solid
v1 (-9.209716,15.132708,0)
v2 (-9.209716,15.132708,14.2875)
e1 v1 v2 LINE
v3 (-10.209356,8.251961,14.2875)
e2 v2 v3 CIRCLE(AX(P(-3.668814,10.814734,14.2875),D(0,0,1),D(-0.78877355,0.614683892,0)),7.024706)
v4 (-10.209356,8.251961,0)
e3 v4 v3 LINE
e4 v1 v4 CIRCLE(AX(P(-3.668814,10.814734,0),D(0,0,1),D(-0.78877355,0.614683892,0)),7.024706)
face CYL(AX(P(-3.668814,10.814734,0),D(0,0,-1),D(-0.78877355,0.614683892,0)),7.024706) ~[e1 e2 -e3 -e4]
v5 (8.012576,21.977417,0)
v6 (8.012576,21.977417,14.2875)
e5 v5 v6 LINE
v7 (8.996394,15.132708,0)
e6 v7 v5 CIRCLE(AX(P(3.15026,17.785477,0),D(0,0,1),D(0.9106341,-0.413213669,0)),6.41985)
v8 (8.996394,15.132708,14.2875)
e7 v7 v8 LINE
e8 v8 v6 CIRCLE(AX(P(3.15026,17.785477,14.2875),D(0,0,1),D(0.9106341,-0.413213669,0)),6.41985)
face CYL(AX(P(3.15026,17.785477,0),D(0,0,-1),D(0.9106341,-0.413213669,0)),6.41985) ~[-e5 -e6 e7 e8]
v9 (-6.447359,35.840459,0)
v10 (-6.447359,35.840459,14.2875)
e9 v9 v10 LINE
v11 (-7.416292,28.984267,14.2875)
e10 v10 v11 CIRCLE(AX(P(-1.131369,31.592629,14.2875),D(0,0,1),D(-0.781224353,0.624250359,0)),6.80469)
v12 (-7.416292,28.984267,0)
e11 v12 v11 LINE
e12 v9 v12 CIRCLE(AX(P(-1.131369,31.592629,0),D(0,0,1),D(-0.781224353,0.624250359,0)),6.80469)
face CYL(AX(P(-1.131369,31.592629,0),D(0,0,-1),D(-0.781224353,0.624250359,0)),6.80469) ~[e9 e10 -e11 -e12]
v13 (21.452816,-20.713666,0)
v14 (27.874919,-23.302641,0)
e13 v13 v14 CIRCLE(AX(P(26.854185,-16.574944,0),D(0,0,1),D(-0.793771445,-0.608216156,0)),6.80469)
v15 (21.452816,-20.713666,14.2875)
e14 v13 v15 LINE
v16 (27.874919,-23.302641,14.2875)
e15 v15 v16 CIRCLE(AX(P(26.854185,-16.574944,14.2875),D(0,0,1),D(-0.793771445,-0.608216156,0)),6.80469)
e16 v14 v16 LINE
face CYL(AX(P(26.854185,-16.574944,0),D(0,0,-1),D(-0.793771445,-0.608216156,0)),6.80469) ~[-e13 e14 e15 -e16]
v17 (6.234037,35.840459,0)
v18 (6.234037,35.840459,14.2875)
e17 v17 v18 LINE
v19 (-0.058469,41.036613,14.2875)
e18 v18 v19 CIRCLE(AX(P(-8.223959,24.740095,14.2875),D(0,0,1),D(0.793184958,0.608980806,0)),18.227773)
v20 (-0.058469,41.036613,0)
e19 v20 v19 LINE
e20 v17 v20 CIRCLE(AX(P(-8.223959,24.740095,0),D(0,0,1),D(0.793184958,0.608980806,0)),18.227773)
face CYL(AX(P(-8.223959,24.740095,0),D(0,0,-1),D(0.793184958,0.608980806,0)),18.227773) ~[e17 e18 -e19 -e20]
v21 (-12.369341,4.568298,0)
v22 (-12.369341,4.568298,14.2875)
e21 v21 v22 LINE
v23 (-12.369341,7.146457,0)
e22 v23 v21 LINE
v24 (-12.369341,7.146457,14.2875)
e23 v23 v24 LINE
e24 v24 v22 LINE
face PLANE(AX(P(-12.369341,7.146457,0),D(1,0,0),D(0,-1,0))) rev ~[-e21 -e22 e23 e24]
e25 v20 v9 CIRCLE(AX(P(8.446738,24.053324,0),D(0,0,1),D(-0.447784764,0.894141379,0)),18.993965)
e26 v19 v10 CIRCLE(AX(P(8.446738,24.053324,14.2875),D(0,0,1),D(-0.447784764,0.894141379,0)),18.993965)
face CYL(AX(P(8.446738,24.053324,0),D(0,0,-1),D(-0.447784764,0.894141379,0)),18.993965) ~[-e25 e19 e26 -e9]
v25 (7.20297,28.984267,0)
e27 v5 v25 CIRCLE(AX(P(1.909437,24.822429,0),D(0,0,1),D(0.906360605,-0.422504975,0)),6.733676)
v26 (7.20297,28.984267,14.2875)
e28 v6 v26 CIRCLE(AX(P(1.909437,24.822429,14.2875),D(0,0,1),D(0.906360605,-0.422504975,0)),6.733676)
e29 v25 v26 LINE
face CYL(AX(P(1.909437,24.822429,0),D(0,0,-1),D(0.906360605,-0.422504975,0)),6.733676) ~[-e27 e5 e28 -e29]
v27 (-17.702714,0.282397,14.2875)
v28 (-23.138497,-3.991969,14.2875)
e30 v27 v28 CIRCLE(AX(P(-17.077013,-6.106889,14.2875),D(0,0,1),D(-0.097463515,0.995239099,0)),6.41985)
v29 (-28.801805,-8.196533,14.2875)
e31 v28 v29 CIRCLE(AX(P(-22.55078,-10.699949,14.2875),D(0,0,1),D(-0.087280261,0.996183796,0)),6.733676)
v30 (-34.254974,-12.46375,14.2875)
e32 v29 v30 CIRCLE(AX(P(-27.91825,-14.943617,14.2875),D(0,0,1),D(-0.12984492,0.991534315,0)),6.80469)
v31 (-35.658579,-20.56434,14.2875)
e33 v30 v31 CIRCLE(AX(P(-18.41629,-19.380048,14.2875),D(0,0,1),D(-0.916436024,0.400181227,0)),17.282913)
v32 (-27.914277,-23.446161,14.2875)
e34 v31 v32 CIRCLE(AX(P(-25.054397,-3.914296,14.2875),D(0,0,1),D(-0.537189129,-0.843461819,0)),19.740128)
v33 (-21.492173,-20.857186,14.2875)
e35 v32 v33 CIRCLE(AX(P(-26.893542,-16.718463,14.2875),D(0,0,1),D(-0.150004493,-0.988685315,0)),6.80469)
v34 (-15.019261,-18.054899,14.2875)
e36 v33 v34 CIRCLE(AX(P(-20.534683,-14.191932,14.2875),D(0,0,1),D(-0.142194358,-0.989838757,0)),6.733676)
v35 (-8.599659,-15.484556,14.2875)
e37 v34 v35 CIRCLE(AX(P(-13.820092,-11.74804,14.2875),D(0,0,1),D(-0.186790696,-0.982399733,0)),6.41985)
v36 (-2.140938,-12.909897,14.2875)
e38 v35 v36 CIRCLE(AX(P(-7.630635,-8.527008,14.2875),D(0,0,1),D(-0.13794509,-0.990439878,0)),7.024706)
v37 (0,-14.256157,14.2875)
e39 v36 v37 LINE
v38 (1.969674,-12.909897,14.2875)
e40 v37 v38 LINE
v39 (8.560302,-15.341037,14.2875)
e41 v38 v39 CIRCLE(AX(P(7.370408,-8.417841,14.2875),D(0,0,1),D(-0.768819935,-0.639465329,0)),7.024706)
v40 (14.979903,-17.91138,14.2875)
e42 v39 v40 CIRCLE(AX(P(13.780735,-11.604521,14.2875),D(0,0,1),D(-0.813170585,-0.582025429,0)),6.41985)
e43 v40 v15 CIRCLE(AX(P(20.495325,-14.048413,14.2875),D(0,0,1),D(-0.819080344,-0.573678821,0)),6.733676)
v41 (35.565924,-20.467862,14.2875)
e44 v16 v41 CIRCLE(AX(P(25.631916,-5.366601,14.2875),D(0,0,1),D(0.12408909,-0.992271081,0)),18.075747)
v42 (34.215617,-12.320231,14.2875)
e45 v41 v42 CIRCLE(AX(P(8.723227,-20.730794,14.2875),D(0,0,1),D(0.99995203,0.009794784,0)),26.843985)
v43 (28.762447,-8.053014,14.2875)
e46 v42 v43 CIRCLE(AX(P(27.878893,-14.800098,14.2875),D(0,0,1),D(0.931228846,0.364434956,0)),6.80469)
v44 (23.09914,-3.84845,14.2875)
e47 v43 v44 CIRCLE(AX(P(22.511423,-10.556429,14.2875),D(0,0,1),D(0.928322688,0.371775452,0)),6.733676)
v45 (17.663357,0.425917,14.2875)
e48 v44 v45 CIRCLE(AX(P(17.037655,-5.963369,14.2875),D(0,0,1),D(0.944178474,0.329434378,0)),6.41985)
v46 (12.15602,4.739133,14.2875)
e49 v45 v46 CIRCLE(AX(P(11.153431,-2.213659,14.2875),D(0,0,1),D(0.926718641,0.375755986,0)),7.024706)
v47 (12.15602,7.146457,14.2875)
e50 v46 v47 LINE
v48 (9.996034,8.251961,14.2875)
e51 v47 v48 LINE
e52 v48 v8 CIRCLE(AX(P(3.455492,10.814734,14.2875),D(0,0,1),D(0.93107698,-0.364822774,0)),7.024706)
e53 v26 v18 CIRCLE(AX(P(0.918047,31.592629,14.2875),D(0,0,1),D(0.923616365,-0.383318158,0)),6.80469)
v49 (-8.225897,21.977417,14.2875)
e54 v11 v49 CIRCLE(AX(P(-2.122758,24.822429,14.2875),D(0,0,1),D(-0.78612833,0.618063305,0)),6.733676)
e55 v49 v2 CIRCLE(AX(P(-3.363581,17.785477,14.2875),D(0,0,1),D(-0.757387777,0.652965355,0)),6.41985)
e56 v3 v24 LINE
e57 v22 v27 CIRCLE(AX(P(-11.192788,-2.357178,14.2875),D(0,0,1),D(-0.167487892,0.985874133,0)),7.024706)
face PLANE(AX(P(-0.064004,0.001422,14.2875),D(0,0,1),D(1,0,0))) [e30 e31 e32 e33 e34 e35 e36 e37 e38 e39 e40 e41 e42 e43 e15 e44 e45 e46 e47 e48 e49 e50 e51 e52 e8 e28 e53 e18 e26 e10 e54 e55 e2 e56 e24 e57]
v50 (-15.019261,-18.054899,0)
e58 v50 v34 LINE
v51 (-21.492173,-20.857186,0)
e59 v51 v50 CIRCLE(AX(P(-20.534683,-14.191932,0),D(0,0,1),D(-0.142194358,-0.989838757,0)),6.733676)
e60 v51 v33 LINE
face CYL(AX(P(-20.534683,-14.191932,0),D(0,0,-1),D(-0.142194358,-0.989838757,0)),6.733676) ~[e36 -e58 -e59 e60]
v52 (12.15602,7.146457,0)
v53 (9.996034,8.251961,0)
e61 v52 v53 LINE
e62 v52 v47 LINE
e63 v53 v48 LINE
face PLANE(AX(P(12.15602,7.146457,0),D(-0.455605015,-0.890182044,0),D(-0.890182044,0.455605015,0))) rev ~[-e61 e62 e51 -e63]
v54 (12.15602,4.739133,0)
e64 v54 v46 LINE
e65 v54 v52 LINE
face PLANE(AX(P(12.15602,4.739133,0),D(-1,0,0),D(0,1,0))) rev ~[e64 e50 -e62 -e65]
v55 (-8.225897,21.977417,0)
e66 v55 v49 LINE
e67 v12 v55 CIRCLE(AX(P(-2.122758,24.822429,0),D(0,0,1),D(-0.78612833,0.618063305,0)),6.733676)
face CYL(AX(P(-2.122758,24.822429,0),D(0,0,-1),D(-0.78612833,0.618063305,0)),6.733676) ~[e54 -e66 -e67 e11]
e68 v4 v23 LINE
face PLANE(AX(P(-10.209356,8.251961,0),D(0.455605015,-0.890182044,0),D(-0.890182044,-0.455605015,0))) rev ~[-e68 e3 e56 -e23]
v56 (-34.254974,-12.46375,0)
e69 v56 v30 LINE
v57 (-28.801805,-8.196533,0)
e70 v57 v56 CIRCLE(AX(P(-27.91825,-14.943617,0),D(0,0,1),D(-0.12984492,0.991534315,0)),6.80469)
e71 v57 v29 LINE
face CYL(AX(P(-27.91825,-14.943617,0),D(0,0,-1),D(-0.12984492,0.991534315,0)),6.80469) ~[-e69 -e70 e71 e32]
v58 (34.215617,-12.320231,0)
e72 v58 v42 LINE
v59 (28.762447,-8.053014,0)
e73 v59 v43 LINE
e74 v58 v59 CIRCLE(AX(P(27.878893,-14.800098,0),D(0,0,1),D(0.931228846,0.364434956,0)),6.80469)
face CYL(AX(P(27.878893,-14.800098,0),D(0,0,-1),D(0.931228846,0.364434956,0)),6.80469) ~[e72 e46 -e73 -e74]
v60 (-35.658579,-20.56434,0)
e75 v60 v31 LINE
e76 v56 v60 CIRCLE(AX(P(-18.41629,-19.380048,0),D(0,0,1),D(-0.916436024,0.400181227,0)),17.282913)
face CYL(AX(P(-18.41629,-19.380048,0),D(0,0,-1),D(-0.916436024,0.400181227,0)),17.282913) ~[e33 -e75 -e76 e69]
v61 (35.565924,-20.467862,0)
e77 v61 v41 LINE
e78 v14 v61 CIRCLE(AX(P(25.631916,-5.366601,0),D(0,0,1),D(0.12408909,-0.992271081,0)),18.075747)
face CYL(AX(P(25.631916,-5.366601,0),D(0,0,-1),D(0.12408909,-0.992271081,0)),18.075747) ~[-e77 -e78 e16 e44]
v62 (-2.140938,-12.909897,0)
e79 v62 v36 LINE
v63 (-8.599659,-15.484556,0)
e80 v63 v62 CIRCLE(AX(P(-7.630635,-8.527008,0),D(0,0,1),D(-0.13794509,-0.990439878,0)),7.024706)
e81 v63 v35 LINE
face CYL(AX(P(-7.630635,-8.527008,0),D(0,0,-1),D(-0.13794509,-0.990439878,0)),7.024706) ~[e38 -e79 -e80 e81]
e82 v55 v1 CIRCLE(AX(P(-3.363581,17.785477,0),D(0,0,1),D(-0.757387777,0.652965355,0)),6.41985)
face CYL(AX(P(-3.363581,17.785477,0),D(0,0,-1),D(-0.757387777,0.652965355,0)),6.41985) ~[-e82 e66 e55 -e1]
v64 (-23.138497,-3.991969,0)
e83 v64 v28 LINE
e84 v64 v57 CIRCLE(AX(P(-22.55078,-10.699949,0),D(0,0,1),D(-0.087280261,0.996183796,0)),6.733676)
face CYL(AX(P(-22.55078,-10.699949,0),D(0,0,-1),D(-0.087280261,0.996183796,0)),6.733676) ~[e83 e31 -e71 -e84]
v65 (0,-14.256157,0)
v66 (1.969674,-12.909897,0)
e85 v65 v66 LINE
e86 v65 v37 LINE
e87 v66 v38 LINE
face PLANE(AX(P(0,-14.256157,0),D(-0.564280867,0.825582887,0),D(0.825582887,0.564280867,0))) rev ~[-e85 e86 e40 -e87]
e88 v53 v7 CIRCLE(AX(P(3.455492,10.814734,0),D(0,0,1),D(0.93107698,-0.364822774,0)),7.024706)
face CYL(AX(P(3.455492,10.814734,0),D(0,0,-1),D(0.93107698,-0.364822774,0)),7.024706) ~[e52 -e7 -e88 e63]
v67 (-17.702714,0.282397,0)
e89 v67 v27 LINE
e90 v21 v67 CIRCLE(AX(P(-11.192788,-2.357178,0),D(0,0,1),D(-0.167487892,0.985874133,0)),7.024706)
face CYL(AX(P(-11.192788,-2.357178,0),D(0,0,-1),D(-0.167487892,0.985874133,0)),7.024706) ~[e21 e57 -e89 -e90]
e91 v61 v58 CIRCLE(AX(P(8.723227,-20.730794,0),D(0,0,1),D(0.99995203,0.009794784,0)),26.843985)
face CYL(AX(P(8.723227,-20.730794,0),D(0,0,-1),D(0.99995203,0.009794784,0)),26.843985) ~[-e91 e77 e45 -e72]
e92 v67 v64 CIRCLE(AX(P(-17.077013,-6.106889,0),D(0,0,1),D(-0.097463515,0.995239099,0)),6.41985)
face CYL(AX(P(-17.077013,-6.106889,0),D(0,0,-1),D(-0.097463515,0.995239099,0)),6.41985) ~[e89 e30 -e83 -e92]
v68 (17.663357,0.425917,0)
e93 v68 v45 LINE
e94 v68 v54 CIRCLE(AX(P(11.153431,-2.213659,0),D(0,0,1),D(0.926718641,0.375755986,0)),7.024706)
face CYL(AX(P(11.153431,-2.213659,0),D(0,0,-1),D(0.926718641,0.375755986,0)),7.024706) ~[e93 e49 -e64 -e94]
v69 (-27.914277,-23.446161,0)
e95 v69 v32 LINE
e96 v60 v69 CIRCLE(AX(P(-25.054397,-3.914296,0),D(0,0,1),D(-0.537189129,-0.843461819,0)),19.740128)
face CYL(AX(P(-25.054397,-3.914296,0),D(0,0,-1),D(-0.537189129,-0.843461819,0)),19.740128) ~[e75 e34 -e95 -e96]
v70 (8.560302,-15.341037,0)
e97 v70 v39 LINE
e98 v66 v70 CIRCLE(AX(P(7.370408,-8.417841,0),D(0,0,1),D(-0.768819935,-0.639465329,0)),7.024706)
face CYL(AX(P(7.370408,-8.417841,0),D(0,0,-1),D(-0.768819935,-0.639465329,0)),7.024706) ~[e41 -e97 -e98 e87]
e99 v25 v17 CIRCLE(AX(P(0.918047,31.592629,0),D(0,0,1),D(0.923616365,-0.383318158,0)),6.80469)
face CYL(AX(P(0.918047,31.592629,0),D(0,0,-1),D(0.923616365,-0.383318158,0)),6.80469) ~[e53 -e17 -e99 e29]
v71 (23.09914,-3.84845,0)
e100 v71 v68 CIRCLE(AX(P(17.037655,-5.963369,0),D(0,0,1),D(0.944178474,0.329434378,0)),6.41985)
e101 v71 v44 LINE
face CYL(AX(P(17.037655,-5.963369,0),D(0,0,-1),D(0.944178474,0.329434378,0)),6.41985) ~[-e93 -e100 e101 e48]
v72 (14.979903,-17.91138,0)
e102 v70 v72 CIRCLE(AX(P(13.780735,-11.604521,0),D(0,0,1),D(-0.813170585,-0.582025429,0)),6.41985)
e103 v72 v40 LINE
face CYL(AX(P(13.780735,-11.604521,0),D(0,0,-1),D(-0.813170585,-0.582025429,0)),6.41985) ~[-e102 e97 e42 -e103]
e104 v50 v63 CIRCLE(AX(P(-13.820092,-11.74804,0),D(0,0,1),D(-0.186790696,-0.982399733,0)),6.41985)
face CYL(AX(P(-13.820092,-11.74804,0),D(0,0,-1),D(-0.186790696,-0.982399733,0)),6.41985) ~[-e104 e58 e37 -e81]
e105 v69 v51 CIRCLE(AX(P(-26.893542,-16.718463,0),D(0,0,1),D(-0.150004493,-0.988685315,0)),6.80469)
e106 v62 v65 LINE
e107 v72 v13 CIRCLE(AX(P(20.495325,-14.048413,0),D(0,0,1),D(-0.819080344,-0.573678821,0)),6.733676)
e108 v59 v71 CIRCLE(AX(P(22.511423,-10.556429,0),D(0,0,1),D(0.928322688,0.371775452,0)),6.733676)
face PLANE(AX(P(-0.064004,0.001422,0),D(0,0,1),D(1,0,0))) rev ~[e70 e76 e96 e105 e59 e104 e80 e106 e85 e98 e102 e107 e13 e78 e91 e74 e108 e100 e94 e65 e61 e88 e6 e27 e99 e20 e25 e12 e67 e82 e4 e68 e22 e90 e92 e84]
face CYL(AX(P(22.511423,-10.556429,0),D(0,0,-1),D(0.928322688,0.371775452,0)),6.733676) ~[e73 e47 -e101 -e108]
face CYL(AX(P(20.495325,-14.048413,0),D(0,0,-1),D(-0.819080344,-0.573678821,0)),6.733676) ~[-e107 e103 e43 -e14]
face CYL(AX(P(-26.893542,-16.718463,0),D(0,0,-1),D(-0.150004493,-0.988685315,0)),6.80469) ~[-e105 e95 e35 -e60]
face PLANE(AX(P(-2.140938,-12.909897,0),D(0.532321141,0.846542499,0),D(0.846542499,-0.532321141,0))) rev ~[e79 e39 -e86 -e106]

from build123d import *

# Parameters (mm, degrees)
F1_DEPTH = 14.2875


# Not quite as in the source:
# - a length typed as a fraction of an inch, garbled in the dataset ("3 / 203.2 mm" for 3/8 in), is restored


with BuildPart() as f1:
    # F0 (on Top) → F1 (new body)
    with BuildSketch(Plane.XY):
        with BuildLine():
            ThreePointArc((-0.0584694644, 41.0366132855), (-3.5379130554, 38.7889545067), (-6.4473585226, 35.840459168))
            ThreePointArc((-6.4473585226, 35.840459168), (-7.8691085687, 32.5448223466), (-7.4162920937, 28.9842672646))
            ThreePointArc((-7.4162920937, 28.9842672646), (-8.8119305122, 25.5953281623), (-8.2258973271, 21.977417171))
            ThreePointArc((-8.2258973271, 21.977417171), (-9.7181261566, 18.698842434), (-9.2097157612, 15.1327075437))
            ThreePointArc((-9.2097157612, 15.1327075437), (-10.6205392688, 11.8246856933), (-10.2093555033, 8.2519613206))
            Line((-10.2093555033, 8.2519613206), (-12.369341217, 7.1464567445))
            Line((-12.369341217, 7.1464567445), (-12.369341217, 4.6386048198))
            Line((-12.369341217, 4.6386048198), (-12.369341217, 4.5682978211))
            ThreePointArc((-12.369341217, 4.5682978211), (-15.5930977879, 3.1185654947), (-17.7027139134, 0.2823972963))
            ThreePointArc((-17.7027139134, 0.2823972963), (-21.0452825194, -1.0603738309), (-23.1384971151, -3.9919692741))
            ThreePointArc((-23.1384971151, -3.9919692741), (-26.5647165348, -5.2934051439), (-28.80180468, -8.19653302))
            ThreePointArc((-28.80180468, -8.19653302), (-32.1117440701, -9.5846599904), (-34.254974256, -12.4637500588))
            ThreePointArc((-34.254974256, -12.4637500588), (-35.4454588739, -16.4293701566), (-35.6585793197, -20.564340055))
            ThreePointArc((-35.6585793197, -20.564340055), (-31.9389059128, -22.4150036937), (-27.9142765499, -23.4461606411))
            ThreePointArc((-27.9142765499, -23.4461606411), (-24.3492963179, -23.0296138883), (-21.4921734029, -20.8571857766))
            ThreePointArc((-21.4921734029, -20.8571857766), (-17.8594468391, -20.3713745504), (-15.0192606046, -18.054899429))
            ThreePointArc((-15.0192606046, -18.054899429), (-11.4338171794, -17.7079201351), (-8.5996589687, -15.484556372))
            ThreePointArc((-8.5996589687, -15.484556372), (-5.0294162563, -15.0523544446), (-2.1409380715, -12.9098966718))
            Line((-2.1409380715, -12.9098966718), (0, -14.2561570176))
            Line((0, -14.2561570176), (1.9696742658, -12.9098966718))
            ThreePointArc((1.9696742658, -12.9098966718), (4.9392756736, -15.0084468105), (8.560301624, -15.3410370587))
            ThreePointArc((8.560301624, -15.3410370587), (11.3944598347, -17.5644008218), (14.9799032599, -17.9113801157))
            ThreePointArc((14.9799032599, -17.9113801157), (17.8200894944, -20.2278552371), (21.4528160582, -20.7136664634))
            ThreePointArc((21.4528160582, -20.7136664634), (24.3099389732, -22.886094575), (27.8749192052, -23.3026413279))
            ThreePointArc((27.8749192052, -23.3026413279), (31.8832272801, -22.3269581873), (35.5659238994, -20.4678624868))
            ThreePointArc((35.5659238994, -20.4678624868), (35.2059818343, -16.3418066269), (34.2156169113, -12.3202307456))
            ThreePointArc((34.2156169113, -12.3202307456), (32.0723867254, -9.4411406771), (28.7624473353, -8.0530137067))
            ThreePointArc((28.7624473353, -8.0530137067), (26.5253591901, -5.1498858306), (23.0991397704, -3.8484499608))
            ThreePointArc((23.0991397704, -3.8484499608), (21.0059251747, -0.9168545176), (17.6633565687, 0.4259166096))
            ThreePointArc((17.6633565687, 0.4259166096), (15.4847616458, 3.3168082822), (12.1560195839, 4.739132713))
            Line((12.1560195839, 4.739132713), (12.1560195839, 7.1464567445))
            Line((12.1560195839, 7.1464567445), (9.9960338703, 8.2519613206))
            ThreePointArc((9.9960338703, 8.2519613206), (10.4072176357, 11.8246856933), (8.9963941282, 15.1327075437))
            ThreePointArc((8.9963941282, 15.1327075437), (9.5048045235, 18.698842434), (8.012575694, 21.977417171))
            ThreePointArc((8.012575694, 21.977417171), (8.5986088792, 25.5953281623), (7.2029704606, 28.9842672646))
            ThreePointArc((7.2029704606, 28.9842672646), (7.6557869357, 32.5448223466), (6.2340368895, 35.840459168))
            ThreePointArc((6.2340368895, 35.840459168), (3.3823120514, 38.7952079886), (-0.0584694644, 41.0366132855))
        make_face()
    extrude(amount=F1_DEPTH)


solid = f1.part
